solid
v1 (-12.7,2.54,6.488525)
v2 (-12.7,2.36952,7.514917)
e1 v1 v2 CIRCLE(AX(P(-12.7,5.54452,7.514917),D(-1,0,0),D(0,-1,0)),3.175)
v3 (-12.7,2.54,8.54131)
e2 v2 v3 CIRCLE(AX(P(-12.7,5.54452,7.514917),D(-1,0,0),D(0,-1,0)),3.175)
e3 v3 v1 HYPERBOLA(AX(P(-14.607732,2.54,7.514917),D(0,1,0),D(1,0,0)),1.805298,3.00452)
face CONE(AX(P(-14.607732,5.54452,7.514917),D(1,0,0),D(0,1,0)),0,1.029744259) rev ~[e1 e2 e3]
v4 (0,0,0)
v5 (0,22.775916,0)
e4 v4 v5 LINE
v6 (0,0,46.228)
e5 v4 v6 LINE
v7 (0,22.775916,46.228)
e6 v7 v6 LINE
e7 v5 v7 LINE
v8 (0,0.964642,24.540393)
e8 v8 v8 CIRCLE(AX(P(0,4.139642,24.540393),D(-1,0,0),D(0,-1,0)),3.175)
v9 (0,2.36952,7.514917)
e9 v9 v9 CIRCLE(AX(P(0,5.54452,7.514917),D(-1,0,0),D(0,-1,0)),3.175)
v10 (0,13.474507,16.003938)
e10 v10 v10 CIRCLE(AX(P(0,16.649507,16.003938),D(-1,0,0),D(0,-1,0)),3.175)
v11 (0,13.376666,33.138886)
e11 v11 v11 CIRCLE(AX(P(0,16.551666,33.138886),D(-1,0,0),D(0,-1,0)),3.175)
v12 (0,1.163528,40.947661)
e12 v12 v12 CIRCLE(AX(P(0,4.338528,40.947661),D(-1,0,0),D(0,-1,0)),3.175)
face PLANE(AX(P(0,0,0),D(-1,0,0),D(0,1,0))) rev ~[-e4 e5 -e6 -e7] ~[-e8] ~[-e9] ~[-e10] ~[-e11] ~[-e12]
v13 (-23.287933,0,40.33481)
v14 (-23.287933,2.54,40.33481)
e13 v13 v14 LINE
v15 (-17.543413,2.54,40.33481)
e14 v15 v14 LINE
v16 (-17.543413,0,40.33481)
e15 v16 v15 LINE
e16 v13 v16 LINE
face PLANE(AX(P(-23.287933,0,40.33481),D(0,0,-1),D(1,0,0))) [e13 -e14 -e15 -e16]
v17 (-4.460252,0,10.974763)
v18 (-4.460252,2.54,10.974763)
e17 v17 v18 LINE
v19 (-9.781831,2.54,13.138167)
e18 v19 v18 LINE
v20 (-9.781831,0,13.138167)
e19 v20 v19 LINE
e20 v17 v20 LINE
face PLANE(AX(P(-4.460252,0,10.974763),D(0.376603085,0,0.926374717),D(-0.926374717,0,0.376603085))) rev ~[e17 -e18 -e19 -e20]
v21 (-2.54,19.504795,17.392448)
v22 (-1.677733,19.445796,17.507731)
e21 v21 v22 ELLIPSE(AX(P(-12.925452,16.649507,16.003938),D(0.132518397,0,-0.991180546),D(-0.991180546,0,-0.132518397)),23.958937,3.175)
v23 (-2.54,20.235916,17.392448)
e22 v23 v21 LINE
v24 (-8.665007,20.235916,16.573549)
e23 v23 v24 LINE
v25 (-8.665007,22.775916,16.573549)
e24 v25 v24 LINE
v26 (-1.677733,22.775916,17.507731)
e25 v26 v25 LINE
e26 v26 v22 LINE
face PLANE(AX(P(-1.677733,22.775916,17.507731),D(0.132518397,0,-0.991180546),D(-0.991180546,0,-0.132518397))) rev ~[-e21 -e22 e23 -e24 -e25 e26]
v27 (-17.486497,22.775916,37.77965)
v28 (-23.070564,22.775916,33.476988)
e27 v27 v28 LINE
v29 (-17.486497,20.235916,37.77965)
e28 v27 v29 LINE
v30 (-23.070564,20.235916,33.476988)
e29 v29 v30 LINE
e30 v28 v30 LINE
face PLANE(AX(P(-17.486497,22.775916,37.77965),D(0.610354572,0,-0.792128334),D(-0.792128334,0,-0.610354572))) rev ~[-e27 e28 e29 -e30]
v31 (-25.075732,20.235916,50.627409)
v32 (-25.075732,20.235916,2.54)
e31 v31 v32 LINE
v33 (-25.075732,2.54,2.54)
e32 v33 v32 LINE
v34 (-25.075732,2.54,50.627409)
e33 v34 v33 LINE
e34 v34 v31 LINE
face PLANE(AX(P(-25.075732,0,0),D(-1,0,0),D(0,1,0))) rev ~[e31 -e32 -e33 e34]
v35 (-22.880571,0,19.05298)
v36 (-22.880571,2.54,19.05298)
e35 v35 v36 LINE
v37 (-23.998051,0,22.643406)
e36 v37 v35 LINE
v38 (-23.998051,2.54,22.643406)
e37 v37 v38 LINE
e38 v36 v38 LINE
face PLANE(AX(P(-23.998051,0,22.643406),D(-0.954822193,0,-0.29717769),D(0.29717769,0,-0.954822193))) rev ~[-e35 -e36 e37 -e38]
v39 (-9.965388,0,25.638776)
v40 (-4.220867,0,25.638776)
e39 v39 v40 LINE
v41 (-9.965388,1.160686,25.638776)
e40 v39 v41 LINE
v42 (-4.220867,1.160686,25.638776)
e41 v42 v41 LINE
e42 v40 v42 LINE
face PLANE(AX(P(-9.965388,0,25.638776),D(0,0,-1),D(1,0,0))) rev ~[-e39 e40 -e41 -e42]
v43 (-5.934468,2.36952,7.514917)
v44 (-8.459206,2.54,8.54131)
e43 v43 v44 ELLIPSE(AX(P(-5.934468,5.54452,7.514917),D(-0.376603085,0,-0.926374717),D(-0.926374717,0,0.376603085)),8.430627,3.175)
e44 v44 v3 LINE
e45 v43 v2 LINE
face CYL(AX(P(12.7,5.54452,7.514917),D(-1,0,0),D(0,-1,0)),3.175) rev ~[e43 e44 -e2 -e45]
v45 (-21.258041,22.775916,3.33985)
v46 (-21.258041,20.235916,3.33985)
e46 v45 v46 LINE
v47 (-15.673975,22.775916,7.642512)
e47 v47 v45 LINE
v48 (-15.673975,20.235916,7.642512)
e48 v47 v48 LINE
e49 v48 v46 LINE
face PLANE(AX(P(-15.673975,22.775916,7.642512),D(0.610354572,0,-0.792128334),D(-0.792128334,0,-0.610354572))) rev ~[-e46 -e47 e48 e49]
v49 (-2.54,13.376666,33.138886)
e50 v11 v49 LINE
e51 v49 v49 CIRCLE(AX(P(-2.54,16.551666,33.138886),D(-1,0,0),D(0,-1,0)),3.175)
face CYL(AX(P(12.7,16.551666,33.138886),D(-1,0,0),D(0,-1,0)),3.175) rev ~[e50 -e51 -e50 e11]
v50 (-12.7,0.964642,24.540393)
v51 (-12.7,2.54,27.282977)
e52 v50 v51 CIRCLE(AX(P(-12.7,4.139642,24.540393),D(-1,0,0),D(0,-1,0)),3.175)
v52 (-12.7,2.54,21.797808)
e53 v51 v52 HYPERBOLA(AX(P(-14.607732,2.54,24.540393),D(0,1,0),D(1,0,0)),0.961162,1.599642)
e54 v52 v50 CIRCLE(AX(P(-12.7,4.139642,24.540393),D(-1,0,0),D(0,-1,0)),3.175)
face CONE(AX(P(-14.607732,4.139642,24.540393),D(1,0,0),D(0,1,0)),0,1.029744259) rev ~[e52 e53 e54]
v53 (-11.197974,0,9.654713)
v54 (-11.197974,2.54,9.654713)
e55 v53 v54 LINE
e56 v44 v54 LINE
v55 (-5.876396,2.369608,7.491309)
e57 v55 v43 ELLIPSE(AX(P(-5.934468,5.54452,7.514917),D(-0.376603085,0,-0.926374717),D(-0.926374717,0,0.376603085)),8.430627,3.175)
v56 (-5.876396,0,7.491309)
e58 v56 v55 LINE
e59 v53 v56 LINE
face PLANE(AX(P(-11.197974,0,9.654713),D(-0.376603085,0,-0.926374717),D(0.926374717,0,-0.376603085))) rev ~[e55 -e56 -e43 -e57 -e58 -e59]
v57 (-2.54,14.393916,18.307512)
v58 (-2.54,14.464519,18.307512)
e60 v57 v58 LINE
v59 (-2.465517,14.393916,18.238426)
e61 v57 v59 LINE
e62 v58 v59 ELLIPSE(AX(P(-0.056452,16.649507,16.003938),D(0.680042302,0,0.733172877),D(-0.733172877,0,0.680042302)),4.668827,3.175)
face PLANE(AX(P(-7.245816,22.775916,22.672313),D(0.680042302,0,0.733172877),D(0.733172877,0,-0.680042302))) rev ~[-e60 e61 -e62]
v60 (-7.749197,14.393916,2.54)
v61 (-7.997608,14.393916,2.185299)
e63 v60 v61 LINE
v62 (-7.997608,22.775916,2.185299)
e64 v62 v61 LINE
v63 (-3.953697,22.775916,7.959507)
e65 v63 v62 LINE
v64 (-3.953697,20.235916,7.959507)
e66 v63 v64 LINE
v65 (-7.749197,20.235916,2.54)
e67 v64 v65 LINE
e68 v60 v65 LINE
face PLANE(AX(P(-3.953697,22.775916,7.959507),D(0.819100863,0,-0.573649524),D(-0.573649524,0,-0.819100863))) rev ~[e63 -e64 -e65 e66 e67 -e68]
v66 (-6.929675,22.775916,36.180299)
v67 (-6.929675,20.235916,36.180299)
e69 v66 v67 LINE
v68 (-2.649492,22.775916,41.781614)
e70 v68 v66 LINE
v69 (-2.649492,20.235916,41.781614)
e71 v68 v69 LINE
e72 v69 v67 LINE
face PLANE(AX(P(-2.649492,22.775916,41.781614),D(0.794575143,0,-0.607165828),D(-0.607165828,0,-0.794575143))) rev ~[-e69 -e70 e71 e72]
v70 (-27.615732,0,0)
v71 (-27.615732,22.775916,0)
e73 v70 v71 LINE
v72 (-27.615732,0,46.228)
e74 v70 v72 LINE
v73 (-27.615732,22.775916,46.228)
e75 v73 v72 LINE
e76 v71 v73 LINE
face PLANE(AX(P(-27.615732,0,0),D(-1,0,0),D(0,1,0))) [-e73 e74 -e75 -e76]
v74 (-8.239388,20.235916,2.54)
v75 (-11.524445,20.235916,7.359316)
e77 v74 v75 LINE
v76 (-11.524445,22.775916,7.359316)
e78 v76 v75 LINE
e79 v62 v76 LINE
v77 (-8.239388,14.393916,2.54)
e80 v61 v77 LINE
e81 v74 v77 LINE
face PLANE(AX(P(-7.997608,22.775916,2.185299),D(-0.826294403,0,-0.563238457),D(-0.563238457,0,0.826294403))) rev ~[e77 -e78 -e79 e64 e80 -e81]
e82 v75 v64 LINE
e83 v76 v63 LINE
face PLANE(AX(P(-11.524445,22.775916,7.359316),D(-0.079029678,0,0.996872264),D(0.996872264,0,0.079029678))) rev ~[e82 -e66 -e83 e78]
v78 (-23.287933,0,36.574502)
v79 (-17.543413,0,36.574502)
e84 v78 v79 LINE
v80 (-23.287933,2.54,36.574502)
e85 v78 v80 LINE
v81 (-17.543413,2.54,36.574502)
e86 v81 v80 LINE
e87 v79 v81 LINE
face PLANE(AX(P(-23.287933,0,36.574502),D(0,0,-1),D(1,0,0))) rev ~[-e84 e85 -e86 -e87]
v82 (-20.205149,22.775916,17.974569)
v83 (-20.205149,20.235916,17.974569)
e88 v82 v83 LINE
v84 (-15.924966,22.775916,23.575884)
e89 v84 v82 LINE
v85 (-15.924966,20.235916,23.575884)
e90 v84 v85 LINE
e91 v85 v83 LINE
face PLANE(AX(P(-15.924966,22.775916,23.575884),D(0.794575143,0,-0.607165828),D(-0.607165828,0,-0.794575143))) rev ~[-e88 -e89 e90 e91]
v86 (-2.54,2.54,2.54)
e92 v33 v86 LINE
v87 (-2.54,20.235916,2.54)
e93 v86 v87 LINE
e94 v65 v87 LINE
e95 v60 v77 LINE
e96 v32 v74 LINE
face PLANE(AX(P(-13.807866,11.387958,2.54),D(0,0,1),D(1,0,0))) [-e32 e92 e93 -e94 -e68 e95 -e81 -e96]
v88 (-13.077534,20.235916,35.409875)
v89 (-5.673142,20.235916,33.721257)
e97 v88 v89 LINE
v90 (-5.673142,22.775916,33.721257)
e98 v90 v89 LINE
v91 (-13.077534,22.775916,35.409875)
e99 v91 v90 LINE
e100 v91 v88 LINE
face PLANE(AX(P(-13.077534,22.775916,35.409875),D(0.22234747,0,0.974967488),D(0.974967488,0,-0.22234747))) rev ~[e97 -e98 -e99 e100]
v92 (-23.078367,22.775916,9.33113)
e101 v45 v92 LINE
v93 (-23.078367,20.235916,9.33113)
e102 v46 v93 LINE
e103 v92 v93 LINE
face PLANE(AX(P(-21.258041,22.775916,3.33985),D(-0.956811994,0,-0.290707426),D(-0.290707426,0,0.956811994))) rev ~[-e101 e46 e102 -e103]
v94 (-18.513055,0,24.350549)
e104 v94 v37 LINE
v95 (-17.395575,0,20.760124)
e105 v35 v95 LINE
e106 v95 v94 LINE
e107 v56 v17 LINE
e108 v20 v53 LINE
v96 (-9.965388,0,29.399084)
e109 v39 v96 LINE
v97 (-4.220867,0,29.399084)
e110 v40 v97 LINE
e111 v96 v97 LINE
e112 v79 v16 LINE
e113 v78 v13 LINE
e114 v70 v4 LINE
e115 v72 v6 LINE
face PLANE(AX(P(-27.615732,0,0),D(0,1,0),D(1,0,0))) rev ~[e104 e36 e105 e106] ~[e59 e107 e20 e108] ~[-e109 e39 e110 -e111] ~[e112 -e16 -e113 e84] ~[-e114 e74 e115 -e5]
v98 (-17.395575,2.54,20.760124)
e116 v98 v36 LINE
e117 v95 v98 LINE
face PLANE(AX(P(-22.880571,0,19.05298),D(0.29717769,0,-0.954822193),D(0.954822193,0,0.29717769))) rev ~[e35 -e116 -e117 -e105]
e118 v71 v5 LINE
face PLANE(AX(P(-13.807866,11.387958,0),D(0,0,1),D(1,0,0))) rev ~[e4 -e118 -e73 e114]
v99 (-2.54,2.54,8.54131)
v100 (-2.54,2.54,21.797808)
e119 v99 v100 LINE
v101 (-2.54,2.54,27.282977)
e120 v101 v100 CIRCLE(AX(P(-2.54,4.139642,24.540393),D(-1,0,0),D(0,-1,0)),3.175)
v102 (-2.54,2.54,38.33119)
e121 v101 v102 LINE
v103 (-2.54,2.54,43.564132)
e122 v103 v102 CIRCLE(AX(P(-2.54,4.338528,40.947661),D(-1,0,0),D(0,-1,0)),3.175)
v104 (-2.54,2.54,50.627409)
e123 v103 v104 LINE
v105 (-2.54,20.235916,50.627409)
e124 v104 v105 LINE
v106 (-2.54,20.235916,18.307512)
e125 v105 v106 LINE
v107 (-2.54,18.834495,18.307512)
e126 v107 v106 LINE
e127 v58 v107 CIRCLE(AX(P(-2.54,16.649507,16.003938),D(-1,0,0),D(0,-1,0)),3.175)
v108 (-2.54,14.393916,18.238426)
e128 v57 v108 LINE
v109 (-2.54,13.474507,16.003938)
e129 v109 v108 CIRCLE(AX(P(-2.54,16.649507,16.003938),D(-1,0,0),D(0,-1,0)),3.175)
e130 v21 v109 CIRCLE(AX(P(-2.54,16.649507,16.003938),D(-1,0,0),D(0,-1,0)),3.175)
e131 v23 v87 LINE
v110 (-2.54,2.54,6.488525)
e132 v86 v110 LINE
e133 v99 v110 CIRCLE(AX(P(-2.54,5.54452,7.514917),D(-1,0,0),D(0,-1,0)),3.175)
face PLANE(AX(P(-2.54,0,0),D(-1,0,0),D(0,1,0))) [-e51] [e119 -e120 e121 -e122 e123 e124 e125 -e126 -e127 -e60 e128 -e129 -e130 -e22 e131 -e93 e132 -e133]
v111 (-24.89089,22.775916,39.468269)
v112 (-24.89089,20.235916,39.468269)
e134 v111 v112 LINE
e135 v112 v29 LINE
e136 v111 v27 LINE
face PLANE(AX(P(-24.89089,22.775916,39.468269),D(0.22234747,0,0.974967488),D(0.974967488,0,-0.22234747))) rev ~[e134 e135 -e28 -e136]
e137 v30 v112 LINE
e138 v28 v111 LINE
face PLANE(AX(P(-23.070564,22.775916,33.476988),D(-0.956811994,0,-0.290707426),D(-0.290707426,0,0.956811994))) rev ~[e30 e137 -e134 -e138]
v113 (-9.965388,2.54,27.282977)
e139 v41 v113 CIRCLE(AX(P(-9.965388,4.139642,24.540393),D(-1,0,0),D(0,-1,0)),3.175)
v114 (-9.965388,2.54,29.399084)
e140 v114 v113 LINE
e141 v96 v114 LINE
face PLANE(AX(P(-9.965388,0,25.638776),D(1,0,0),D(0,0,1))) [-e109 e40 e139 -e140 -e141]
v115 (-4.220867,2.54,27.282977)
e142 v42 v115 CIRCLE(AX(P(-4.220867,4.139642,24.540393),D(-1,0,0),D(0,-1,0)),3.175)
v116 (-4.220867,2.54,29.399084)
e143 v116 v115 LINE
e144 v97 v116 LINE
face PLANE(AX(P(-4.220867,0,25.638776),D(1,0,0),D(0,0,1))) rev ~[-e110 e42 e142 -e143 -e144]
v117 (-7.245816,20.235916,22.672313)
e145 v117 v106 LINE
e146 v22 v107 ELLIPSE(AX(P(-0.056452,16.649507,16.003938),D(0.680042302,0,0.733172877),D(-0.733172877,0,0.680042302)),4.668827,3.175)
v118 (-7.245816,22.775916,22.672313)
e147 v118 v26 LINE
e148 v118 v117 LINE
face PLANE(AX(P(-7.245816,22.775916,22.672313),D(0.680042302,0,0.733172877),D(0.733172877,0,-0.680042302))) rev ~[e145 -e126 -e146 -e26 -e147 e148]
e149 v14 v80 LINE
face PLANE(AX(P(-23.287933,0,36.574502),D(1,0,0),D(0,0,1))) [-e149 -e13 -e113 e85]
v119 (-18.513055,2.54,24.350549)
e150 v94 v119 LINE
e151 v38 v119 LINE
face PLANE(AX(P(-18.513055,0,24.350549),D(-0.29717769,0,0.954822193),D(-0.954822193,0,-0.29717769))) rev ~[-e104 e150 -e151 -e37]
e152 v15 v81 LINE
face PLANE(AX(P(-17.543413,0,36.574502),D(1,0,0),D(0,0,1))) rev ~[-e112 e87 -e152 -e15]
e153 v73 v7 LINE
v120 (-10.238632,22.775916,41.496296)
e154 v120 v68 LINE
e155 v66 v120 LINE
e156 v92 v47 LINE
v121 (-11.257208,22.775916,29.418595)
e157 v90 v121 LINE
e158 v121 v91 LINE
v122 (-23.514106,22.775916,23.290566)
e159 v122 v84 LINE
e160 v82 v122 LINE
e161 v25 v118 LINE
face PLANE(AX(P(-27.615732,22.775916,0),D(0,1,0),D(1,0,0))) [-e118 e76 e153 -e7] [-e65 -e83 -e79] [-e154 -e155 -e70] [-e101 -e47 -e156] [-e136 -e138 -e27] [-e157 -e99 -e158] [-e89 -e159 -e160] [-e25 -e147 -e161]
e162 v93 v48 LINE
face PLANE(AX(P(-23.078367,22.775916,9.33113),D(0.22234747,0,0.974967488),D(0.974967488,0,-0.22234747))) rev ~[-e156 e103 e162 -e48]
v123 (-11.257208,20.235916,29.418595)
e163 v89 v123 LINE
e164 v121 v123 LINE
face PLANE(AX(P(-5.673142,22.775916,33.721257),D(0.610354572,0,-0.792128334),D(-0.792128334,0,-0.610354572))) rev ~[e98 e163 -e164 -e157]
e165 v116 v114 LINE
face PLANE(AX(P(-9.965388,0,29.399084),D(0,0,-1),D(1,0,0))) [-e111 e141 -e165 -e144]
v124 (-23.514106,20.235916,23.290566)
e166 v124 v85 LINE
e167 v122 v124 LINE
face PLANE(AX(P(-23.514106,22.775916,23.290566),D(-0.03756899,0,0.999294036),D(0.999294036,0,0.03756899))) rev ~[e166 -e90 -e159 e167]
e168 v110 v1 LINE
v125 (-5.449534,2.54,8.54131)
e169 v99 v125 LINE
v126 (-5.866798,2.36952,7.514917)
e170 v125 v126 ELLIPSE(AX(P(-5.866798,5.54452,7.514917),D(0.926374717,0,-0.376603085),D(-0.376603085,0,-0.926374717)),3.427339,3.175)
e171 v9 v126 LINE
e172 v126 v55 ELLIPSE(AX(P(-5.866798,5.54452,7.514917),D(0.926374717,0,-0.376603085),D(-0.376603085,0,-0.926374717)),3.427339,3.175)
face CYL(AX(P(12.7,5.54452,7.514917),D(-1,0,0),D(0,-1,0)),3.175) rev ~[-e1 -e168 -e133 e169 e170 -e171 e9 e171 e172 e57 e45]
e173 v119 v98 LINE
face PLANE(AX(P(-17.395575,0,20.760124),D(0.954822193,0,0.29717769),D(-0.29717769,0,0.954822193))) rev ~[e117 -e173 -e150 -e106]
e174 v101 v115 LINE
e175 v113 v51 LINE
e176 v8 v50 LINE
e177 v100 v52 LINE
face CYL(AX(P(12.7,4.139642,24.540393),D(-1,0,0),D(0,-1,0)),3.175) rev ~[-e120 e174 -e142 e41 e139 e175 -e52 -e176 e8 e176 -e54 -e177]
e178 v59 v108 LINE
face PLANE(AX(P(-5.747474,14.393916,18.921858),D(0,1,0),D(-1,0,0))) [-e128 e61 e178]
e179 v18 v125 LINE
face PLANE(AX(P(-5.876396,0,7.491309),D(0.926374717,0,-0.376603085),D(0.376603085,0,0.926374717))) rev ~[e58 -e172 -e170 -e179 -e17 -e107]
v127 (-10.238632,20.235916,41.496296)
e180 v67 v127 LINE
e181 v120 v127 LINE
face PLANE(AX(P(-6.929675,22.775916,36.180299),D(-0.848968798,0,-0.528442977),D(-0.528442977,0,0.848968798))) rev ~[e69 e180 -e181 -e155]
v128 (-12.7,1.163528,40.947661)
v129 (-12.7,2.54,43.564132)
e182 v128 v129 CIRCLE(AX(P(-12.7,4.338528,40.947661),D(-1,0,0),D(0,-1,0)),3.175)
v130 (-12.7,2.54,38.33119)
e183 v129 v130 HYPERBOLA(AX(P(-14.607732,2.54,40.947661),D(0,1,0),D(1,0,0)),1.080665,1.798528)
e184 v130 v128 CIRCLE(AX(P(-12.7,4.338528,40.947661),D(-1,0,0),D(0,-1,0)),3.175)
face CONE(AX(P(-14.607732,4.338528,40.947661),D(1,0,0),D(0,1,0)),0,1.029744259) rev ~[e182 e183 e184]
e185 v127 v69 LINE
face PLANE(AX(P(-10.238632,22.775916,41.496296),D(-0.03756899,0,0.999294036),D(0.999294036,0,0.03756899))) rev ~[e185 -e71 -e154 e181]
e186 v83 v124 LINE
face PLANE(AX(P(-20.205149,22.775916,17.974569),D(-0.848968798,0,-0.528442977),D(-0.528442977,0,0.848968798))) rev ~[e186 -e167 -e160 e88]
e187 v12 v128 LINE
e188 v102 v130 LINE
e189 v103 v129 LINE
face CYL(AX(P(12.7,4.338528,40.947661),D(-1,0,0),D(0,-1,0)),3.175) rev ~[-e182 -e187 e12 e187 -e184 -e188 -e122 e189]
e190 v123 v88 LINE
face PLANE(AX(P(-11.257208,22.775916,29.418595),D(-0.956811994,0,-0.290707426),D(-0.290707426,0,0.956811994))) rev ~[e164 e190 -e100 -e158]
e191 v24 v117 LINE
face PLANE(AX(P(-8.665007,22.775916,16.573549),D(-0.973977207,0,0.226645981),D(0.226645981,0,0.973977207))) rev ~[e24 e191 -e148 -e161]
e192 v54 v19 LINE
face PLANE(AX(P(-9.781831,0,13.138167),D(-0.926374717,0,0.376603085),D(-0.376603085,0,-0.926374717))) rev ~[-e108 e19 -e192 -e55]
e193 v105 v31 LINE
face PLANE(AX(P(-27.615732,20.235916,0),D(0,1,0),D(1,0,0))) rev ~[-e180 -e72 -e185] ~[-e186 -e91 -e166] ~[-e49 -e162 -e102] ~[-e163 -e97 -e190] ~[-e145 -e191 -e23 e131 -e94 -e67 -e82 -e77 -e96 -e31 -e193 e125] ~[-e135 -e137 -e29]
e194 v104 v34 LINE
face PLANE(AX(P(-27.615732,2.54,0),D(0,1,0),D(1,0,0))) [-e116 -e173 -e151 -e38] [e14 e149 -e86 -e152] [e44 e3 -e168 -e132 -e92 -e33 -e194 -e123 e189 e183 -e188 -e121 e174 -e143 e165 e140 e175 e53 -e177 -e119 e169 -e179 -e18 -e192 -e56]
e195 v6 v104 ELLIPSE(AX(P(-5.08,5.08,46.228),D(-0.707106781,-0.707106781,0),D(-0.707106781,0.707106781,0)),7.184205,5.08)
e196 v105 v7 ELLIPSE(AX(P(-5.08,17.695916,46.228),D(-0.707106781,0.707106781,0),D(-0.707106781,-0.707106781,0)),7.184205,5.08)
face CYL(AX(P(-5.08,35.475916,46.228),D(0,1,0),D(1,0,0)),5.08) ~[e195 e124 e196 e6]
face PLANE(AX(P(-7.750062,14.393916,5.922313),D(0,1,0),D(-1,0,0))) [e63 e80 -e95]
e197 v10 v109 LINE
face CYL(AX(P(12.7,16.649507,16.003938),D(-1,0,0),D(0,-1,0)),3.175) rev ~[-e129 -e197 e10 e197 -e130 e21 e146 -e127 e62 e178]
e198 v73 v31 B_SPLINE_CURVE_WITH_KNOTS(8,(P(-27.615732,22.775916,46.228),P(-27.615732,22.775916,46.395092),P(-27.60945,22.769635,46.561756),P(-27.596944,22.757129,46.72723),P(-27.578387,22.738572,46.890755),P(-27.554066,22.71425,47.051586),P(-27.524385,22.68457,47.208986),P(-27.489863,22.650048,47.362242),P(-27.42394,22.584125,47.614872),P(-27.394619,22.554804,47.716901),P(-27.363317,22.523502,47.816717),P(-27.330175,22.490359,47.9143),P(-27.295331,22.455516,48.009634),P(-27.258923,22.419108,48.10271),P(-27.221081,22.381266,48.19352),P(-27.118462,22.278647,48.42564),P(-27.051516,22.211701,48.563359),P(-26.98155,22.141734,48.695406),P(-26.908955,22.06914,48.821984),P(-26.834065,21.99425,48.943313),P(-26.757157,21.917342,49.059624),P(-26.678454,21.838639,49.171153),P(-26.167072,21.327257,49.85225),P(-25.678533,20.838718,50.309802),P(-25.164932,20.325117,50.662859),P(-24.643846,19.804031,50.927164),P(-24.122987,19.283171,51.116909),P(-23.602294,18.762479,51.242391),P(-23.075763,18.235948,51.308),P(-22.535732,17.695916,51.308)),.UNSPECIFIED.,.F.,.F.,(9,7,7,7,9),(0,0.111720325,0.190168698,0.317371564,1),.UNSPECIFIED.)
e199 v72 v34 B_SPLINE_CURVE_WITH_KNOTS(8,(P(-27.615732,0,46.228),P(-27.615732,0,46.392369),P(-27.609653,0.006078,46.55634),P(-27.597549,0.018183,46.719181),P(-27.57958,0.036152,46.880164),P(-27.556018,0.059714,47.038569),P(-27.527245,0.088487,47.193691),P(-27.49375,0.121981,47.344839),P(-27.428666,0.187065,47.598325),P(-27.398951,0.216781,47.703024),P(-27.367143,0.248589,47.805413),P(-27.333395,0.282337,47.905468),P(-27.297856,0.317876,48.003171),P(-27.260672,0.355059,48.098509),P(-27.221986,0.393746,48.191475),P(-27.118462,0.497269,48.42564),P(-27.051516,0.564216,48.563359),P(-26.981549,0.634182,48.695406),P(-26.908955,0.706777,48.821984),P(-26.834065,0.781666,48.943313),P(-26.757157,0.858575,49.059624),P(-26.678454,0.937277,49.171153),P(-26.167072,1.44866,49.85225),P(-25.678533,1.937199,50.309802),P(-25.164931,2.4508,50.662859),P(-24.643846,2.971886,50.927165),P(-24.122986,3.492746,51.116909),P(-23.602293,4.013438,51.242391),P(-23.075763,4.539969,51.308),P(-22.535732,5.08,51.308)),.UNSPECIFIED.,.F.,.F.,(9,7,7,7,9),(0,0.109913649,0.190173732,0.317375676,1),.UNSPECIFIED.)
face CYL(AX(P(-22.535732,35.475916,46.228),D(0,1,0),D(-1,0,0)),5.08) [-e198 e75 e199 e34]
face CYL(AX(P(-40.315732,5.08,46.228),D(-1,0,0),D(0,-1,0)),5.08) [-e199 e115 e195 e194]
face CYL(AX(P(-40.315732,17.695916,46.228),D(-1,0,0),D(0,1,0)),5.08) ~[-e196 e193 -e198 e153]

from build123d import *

# Parameters (mm, degrees)
F0_W        = 27.615731582
F0_H        = 22.7759163827
F1_DEPTH    = 51.308
F2_T        = -2.54
F3_T1_DEPTH = 53.015731582
F3_T3_DEPTH = 48.1759163827
F4_W        = 5.7445205748
F4_H        = 3.7603080273
F5_DEPTH    = 4.826
F7_D        = 6.35
F7_DEPTH    = 12.7
F7_TIP      = 1.9077324654
F9_DEPTH    = 8.382


# Not quite as in the source:
# - a fillet or chamfer that OpenCascade refuses, or shapes differently, is made with other operations: its cross-section is extruded or revolved along the edge and cut away or added


with BuildPart() as f1:
    # F0 (on Top) → F1 (new body)
    with BuildSketch(Plane.XY):
        with Locations((-13.807865791, 11.3879581913)):
            Rectangle(F0_W, F0_H)
    extrude(amount=F1_DEPTH)

    # F2
    f2_openings = [f1.faces().sort_by_distance(p)[0] for p in [
        (-13.807866, 11.387958, 51.308),
    ]]
    offset(amount=F2_T, openings=f2_openings)

    # F3: fillet of radius 5.08 on 4 edges, made by hand

    # F3_s2 → F3_t1 (cut)
    with BuildSketch(Plane.YZ.offset(-40.315731582)):
        with BuildLine():
            ThreePointArc((0, 46.228), (1.4878975516, 49.8201024484), (5.08, 51.308))
            Line((5.08, 51.308), (0, 51.308))
            Line((0, 51.308), (0, 46.228))
        make_face()
        with BuildLine():
            ThreePointArc((22.7759163827, 46.228), (21.2880188311, 49.8201024484), (17.6959163827, 51.308))
            Line((17.6959163827, 51.308), (22.7759163827, 51.308))
            Line((22.7759163827, 51.308), (22.7759163827, 46.228))
        make_face()
    extrude(amount=F3_T1_DEPTH, mode=Mode.SUBTRACT)

    # F3_s4 → F3_t3 (cut)
    with BuildSketch(Plane.XZ.offset(-35.4759163827)):
        with BuildLine():
            ThreePointArc((-27.615731582, 46.228), (-26.1278340305, 49.8201024484), (-22.535731582, 51.308))
            Line((-22.535731582, 51.308), (-27.615731582, 51.308))
            Line((-27.615731582, 51.308), (-27.615731582, 46.228))
        make_face()
        with BuildLine():
            ThreePointArc((0, 46.228), (-1.4878975516, 49.8201024484), (-5.08, 51.308))
            Line((-5.08, 51.308), (0, 51.308))
            Line((0, 51.308), (0, 46.228))
        make_face()
    extrude(amount=F3_T3_DEPTH, mode=Mode.SUBTRACT)

    # F4 (on face) → F5 (cut)
    with BuildSketch(Plane.XZ):
        with Locations((-20.4156730324, 38.4546555579)):
            Rectangle(F4_W, F4_H)
        with Locations((-7.0931273513, 27.5189299136)):
            Rectangle(F4_W, F4_H)
        Polygon((-18.5130548821, 24.3505493797), (-23.9980506161, 22.6434060253), (-22.880570963, 19.0529804677), (-17.395575229, 20.7601238221), align=None)
        Polygon((-4.4602522607, 10.9747632246), (-9.781830883, 13.1381673943), (-11.1979744862, 9.6547131094), (-5.8763958639, 7.4913089397), align=None)
    extrude(amount=-F5_DEPTH, mode=Mode.SUBTRACT)

    # F7
    with Locations(Plane.YZ):
        with Locations((4.3385280296, 40.9476608038), (16.5516659617, 33.1388860941), (4.1396417655, 24.540392682), (16.6495069861, 16.0039383918), (5.5445204489, 7.5149172917)):
            Hole(F7_D / 2, depth=F7_DEPTH)
            with Locations((0, 0, -(F7_DEPTH + F7_TIP / 2))):  # 118° drill point
                Cone(0, F7_D / 2, F7_TIP, mode=Mode.SUBTRACT)

    # F8 (on face) → F9 (cut)
    with BuildSketch(Plane(origin=(0, 22.7759163827, 0), x_dir=(-1, 0, 0), z_dir=(0, 1, 0))):
        Polygon((13.0775338039, 35.4098752141), (5.6731416844, 33.7212570012), (11.2572079524, 29.4185951352), align=None)
        Polygon((23.5141057819, 23.2905662243), (15.9249656523, 23.5758839796), (20.2051486408, 17.9745690622), align=None)
        Polygon((7.2458156385, 22.6723130022), (1.6777330699, 17.5077306728), (8.6650072474, 16.573549327), align=None)
        Polygon((23.0783666484, 9.331129957), (15.6739745289, 7.6425117441), (21.258040797, 3.3398498781), align=None)
        Polygon((11.5244448229, 7.3593156172), (3.9536968494, 7.9595066297), (7.997608447, 2.1852989602), align=None)
        Polygon((24.8908895689, 39.4682685534), (17.4864974494, 37.7796503405), (23.0705637174, 33.4769884745), align=None)
        Polygon((10.2386324033, 41.4962964688), (2.6494922737, 41.7816142241), (6.9296752622, 36.1802993067), align=None)
    extrude(amount=-F9_DEPTH, mode=Mode.SUBTRACT)


solid = f1.part
